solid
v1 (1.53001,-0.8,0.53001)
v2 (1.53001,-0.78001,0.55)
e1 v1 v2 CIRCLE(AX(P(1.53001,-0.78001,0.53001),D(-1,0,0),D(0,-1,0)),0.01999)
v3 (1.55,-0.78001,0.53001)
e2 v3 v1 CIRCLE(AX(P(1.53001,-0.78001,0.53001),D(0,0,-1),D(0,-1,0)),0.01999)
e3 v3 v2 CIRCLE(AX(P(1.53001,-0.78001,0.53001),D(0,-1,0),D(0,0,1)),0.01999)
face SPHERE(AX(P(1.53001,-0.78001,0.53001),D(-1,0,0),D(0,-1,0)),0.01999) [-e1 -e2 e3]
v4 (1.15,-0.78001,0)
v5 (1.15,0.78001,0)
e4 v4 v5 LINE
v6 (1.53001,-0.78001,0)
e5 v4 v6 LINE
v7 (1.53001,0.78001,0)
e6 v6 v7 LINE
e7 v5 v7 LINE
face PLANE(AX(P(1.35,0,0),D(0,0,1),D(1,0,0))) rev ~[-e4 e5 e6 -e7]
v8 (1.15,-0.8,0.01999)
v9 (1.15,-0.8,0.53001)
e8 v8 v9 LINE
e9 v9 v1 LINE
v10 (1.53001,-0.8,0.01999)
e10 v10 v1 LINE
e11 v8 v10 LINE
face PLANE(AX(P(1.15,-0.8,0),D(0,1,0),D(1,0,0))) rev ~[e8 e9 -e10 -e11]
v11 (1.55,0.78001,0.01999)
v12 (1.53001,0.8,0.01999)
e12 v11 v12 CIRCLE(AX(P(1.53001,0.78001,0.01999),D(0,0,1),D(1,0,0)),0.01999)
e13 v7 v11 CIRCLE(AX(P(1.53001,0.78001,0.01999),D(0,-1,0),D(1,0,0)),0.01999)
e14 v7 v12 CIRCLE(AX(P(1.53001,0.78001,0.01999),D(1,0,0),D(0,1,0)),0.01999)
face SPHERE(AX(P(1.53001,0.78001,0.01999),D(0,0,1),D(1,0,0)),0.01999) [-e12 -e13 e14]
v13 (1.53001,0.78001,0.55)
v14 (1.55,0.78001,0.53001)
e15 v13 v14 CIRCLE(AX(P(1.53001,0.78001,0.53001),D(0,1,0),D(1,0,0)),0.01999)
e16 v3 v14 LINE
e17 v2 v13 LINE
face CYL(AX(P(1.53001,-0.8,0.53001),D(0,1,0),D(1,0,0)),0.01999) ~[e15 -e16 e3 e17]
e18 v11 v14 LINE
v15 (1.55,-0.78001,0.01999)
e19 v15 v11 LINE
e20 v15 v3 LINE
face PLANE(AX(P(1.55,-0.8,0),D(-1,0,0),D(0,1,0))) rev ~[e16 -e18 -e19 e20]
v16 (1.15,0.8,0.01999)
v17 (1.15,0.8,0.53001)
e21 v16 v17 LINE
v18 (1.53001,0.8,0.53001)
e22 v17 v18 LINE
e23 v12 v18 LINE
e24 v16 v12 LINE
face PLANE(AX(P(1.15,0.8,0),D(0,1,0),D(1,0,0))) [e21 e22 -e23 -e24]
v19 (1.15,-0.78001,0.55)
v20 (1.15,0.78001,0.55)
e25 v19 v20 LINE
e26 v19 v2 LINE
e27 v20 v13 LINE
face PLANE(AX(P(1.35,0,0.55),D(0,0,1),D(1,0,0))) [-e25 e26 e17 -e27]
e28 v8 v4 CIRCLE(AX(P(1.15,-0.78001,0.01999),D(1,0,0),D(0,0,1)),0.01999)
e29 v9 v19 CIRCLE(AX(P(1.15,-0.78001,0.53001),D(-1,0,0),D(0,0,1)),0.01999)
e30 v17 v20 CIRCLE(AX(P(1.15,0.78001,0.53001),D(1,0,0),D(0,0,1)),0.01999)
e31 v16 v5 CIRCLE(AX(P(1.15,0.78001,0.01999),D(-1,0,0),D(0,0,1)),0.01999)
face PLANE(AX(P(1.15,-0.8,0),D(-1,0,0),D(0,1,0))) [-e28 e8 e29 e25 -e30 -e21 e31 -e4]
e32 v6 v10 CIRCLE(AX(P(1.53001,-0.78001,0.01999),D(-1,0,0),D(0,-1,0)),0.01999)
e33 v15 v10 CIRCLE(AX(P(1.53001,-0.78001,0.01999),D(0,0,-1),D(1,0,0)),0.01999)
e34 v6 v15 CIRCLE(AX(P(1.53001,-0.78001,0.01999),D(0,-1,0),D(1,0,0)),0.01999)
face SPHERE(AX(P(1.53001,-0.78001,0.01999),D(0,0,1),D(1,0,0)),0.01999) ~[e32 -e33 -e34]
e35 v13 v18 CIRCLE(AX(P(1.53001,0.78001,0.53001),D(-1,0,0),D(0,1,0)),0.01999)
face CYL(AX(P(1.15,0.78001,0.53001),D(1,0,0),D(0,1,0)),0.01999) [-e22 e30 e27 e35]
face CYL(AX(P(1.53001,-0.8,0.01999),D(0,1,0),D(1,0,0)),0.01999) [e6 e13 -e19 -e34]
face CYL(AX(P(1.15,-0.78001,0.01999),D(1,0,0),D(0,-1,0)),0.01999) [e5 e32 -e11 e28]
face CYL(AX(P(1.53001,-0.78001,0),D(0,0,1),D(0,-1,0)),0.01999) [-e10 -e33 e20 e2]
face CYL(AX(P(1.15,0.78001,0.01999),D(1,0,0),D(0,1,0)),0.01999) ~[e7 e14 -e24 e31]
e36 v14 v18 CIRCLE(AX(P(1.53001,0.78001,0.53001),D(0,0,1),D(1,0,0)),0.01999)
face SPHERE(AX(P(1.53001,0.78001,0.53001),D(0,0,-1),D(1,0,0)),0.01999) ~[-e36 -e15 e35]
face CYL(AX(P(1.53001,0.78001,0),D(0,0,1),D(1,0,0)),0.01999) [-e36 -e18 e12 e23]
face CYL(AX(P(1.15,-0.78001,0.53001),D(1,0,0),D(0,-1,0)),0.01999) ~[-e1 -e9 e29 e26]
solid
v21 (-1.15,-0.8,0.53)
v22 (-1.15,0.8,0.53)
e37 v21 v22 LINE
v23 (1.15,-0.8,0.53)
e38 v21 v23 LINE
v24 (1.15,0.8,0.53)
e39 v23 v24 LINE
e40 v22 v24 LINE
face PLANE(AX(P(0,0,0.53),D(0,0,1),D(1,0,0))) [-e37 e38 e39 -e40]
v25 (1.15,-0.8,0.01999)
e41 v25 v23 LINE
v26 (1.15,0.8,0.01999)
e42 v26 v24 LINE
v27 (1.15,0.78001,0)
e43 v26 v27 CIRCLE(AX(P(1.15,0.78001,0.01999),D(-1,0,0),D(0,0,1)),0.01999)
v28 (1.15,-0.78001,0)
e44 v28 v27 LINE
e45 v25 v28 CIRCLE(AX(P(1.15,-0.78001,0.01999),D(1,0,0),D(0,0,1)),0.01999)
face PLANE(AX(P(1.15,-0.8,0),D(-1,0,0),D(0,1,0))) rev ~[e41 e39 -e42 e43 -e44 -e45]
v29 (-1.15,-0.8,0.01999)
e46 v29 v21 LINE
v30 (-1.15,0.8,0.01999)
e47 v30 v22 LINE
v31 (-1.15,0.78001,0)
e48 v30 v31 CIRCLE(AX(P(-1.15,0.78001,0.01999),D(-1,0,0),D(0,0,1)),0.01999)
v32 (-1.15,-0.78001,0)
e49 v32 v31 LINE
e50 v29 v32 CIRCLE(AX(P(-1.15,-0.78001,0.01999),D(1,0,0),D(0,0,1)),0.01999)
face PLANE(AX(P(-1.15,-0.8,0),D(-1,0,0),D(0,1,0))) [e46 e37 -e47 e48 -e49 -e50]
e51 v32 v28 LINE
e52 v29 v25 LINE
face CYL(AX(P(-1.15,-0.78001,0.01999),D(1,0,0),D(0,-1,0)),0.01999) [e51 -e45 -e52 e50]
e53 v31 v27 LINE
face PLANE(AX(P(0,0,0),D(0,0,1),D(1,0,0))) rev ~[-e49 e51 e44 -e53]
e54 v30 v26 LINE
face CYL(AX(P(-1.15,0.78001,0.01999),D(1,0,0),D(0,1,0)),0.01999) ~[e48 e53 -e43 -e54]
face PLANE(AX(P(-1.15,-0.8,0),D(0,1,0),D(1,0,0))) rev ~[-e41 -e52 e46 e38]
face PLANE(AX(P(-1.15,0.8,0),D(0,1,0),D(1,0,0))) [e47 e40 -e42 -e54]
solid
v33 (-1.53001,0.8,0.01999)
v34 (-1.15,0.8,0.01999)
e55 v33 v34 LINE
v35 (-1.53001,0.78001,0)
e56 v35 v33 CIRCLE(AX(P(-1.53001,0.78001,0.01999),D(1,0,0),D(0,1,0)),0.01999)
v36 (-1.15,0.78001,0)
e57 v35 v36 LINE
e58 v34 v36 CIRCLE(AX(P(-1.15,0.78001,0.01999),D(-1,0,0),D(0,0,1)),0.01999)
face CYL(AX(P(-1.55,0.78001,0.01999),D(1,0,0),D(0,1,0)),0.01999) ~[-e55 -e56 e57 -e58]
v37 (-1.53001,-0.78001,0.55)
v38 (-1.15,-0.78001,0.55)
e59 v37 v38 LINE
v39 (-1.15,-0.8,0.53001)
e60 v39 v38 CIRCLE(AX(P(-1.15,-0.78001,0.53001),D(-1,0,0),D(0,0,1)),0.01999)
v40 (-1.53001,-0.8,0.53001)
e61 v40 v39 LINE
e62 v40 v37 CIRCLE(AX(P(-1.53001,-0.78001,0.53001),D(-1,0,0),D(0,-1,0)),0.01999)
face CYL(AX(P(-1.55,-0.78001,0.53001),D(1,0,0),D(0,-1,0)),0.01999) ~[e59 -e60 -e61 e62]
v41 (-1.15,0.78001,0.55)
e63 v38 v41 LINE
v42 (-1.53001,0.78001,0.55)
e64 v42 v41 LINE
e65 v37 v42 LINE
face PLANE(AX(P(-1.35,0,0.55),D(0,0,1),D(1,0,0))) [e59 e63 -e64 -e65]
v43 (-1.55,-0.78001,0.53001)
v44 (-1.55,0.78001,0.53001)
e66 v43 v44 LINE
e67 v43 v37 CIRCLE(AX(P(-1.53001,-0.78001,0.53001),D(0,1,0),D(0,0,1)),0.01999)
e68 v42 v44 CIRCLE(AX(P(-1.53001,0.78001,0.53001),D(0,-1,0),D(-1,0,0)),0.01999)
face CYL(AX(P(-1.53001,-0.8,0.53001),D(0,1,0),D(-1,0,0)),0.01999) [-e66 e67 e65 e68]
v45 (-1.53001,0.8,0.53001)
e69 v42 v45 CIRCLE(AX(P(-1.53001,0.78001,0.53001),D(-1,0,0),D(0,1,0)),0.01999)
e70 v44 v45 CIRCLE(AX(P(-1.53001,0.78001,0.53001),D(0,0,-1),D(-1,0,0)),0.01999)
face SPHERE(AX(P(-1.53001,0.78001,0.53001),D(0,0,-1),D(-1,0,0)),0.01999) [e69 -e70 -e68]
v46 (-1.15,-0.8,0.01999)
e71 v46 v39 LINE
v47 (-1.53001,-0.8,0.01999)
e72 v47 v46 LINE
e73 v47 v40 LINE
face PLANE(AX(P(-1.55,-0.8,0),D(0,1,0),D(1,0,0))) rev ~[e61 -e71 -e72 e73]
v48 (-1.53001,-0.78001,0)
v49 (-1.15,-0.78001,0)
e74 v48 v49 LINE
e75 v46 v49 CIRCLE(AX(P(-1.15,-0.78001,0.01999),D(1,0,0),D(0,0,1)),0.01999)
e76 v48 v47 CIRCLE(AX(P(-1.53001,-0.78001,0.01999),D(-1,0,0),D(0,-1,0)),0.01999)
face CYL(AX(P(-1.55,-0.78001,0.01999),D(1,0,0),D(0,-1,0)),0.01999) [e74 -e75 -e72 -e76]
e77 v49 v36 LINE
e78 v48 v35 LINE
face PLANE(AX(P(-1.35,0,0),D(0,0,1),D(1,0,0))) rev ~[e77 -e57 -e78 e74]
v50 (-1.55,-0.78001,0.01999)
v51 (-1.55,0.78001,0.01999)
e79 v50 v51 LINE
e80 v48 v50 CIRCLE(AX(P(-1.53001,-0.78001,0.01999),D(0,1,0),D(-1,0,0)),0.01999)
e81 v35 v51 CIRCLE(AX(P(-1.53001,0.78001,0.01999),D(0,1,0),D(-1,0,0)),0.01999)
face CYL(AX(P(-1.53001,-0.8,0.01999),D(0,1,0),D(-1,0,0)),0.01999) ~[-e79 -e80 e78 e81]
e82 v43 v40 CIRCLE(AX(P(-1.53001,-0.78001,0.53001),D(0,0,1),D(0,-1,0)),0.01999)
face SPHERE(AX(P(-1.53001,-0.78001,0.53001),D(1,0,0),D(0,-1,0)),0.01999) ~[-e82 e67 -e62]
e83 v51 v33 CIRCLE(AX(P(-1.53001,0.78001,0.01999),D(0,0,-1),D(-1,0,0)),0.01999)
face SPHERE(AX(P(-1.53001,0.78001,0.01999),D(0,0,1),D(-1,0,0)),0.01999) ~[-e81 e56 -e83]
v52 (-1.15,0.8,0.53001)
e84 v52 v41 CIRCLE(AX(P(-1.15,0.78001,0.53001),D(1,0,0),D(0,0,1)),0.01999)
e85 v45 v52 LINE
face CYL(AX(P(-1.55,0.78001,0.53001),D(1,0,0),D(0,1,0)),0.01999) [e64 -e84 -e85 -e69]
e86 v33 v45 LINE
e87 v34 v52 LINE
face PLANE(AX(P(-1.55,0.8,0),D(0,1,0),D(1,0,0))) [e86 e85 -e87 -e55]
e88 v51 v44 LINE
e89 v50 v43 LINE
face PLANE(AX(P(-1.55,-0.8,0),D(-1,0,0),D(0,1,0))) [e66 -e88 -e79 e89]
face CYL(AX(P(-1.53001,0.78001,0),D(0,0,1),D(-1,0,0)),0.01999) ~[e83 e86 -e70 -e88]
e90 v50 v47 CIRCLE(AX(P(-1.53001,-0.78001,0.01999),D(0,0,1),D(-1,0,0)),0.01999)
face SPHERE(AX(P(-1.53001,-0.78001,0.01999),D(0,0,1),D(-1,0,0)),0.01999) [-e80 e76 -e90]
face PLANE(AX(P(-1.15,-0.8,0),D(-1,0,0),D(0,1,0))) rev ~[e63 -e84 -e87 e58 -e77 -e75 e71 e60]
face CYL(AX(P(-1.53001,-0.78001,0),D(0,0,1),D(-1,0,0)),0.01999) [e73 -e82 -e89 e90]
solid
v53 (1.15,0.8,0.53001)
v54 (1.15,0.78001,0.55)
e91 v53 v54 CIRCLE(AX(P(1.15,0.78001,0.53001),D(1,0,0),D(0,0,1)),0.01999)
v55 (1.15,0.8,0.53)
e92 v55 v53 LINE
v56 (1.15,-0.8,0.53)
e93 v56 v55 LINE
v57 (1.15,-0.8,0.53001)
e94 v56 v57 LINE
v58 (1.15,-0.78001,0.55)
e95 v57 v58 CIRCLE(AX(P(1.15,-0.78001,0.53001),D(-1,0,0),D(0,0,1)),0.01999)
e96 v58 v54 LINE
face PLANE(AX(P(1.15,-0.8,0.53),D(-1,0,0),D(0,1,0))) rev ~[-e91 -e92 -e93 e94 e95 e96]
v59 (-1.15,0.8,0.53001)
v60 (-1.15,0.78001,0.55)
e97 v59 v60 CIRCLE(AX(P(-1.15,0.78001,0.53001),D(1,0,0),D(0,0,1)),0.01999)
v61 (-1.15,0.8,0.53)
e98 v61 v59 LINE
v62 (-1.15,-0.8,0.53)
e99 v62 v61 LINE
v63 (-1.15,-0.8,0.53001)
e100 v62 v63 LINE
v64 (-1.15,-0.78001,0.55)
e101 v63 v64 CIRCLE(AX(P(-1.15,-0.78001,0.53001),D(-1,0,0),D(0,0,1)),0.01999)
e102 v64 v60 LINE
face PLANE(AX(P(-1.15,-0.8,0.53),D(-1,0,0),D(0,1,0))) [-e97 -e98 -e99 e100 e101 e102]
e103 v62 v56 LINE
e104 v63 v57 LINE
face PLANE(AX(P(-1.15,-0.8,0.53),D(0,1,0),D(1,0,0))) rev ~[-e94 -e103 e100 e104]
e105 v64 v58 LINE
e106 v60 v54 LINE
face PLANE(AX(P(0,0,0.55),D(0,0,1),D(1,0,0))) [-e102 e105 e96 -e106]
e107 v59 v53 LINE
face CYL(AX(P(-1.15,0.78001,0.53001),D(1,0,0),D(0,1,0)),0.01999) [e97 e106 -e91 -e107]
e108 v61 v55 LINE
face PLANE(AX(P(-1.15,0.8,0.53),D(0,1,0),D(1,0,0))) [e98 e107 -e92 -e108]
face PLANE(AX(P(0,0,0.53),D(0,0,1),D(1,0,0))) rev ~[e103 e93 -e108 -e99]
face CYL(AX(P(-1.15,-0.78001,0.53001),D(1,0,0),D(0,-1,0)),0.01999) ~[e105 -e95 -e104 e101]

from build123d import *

# Parameters (mm, degrees)
F2_W     = 2.3
F2_H     = 1.6
F3_DEPTH = 0.53
F2_W_2   = 0.4
F4_DEPTH = 0.55
F5_DEPTH = 0.55
F6_DEPTH = 0.02
F7_R     = 0.01999
F7_2_R   = 0.01999
F7_3_R   = 0.01999
F7_4_R   = 0.01999


# Not quite as in the source:
# - a fillet or chamfer is up to 0.001 mm smaller than in the source, because OpenCascade refuses the exact size


with BuildPart() as f3:
    # F2 (on Top) → F3 (new body)
    with BuildSketch(Plane.XY):
        Rectangle(F2_W, F2_H)
    extrude(amount=F3_DEPTH)


with BuildPart() as f4:
    # F2 (on Top) → F4 (new body)
    with BuildSketch(Plane.XY):
        with Locations((-1.35, 0)):
            Rectangle(F2_W_2, F2_H)
    extrude(amount=F4_DEPTH)

    # F7 (radius 0.02 in the source; OpenCascade refuses exactly that, so slightly less here)
    f7_edges = [f4.edges().sort_by_distance(p)[0] for p in [
        (-1.35, -0.8, 0.55),
        (-1.55, 0.8, 0.275),
        (-1.55, -0.8, 0.275),
        (-1.55, 0, 0),
        (-1.55, 0, 0.55),
        (-1.35, 0.8, 0.55),
        (-1.35, 0.8, 0),
        (-1.35, -0.8, 0),
    ]]
    fillet(f7_edges, radius=F7_R)


with BuildPart() as f5:
    # F2 (on Top) → F5 (new body)
    with BuildSketch(Plane.XY):
        with Locations((1.35, 0)):
            Rectangle(F2_W_2, F2_H)
    extrude(amount=F5_DEPTH)

    # F7#2 (radius 0.02 in the source; OpenCascade refuses exactly that, so slightly less here)
    f7_2_edges = [f5.edges().sort_by_distance(p)[0] for p in [
        (1.35, -0.8, 0.55),
        (1.55, -0.8, 0.275),
        (1.55, 0.8, 0.275),
        (1.55, 0, 0),
        (1.55, 0, 0.55),
        (1.35, 0.8, 0.55),
        (1.35, 0.8, 0),
        (1.35, -0.8, 0),
    ]]
    fillet(f7_2_edges, radius=F7_2_R)


with BuildPart() as f6:
    # F6 (new): a face of the model
    f6_faces = [f3.part.faces().sort_by_distance(p)[0] for p in [
        (0, 0, 0.53),
    ]]
    extrude(f6_faces, amount=F6_DEPTH)

    # F7#4 (radius 0.02 in the source; OpenCascade refuses exactly that, so slightly less here)
    f7_4_edges = [f6.edges().sort_by_distance(p)[0] for p in [
        (0, -0.8, 0.55),
        (0, 0.8, 0.55),
    ]]
    fillet(f7_4_edges, radius=F7_4_R)


with BuildPart() as f3_1:
    add(f3.part)

    # F7#3 (radius 0.02 in the source; OpenCascade refuses exactly that, so slightly less here)
    f7_3_edges = [f3_1.edges().sort_by_distance(p)[0] for p in [
        (0, 0.8, 0),
        (0, -0.8, 0),
    ]]
    fillet(f7_3_edges, radius=F7_3_R)


solid = Compound([f4.part, f5.part, f6.part, f3_1.part])
